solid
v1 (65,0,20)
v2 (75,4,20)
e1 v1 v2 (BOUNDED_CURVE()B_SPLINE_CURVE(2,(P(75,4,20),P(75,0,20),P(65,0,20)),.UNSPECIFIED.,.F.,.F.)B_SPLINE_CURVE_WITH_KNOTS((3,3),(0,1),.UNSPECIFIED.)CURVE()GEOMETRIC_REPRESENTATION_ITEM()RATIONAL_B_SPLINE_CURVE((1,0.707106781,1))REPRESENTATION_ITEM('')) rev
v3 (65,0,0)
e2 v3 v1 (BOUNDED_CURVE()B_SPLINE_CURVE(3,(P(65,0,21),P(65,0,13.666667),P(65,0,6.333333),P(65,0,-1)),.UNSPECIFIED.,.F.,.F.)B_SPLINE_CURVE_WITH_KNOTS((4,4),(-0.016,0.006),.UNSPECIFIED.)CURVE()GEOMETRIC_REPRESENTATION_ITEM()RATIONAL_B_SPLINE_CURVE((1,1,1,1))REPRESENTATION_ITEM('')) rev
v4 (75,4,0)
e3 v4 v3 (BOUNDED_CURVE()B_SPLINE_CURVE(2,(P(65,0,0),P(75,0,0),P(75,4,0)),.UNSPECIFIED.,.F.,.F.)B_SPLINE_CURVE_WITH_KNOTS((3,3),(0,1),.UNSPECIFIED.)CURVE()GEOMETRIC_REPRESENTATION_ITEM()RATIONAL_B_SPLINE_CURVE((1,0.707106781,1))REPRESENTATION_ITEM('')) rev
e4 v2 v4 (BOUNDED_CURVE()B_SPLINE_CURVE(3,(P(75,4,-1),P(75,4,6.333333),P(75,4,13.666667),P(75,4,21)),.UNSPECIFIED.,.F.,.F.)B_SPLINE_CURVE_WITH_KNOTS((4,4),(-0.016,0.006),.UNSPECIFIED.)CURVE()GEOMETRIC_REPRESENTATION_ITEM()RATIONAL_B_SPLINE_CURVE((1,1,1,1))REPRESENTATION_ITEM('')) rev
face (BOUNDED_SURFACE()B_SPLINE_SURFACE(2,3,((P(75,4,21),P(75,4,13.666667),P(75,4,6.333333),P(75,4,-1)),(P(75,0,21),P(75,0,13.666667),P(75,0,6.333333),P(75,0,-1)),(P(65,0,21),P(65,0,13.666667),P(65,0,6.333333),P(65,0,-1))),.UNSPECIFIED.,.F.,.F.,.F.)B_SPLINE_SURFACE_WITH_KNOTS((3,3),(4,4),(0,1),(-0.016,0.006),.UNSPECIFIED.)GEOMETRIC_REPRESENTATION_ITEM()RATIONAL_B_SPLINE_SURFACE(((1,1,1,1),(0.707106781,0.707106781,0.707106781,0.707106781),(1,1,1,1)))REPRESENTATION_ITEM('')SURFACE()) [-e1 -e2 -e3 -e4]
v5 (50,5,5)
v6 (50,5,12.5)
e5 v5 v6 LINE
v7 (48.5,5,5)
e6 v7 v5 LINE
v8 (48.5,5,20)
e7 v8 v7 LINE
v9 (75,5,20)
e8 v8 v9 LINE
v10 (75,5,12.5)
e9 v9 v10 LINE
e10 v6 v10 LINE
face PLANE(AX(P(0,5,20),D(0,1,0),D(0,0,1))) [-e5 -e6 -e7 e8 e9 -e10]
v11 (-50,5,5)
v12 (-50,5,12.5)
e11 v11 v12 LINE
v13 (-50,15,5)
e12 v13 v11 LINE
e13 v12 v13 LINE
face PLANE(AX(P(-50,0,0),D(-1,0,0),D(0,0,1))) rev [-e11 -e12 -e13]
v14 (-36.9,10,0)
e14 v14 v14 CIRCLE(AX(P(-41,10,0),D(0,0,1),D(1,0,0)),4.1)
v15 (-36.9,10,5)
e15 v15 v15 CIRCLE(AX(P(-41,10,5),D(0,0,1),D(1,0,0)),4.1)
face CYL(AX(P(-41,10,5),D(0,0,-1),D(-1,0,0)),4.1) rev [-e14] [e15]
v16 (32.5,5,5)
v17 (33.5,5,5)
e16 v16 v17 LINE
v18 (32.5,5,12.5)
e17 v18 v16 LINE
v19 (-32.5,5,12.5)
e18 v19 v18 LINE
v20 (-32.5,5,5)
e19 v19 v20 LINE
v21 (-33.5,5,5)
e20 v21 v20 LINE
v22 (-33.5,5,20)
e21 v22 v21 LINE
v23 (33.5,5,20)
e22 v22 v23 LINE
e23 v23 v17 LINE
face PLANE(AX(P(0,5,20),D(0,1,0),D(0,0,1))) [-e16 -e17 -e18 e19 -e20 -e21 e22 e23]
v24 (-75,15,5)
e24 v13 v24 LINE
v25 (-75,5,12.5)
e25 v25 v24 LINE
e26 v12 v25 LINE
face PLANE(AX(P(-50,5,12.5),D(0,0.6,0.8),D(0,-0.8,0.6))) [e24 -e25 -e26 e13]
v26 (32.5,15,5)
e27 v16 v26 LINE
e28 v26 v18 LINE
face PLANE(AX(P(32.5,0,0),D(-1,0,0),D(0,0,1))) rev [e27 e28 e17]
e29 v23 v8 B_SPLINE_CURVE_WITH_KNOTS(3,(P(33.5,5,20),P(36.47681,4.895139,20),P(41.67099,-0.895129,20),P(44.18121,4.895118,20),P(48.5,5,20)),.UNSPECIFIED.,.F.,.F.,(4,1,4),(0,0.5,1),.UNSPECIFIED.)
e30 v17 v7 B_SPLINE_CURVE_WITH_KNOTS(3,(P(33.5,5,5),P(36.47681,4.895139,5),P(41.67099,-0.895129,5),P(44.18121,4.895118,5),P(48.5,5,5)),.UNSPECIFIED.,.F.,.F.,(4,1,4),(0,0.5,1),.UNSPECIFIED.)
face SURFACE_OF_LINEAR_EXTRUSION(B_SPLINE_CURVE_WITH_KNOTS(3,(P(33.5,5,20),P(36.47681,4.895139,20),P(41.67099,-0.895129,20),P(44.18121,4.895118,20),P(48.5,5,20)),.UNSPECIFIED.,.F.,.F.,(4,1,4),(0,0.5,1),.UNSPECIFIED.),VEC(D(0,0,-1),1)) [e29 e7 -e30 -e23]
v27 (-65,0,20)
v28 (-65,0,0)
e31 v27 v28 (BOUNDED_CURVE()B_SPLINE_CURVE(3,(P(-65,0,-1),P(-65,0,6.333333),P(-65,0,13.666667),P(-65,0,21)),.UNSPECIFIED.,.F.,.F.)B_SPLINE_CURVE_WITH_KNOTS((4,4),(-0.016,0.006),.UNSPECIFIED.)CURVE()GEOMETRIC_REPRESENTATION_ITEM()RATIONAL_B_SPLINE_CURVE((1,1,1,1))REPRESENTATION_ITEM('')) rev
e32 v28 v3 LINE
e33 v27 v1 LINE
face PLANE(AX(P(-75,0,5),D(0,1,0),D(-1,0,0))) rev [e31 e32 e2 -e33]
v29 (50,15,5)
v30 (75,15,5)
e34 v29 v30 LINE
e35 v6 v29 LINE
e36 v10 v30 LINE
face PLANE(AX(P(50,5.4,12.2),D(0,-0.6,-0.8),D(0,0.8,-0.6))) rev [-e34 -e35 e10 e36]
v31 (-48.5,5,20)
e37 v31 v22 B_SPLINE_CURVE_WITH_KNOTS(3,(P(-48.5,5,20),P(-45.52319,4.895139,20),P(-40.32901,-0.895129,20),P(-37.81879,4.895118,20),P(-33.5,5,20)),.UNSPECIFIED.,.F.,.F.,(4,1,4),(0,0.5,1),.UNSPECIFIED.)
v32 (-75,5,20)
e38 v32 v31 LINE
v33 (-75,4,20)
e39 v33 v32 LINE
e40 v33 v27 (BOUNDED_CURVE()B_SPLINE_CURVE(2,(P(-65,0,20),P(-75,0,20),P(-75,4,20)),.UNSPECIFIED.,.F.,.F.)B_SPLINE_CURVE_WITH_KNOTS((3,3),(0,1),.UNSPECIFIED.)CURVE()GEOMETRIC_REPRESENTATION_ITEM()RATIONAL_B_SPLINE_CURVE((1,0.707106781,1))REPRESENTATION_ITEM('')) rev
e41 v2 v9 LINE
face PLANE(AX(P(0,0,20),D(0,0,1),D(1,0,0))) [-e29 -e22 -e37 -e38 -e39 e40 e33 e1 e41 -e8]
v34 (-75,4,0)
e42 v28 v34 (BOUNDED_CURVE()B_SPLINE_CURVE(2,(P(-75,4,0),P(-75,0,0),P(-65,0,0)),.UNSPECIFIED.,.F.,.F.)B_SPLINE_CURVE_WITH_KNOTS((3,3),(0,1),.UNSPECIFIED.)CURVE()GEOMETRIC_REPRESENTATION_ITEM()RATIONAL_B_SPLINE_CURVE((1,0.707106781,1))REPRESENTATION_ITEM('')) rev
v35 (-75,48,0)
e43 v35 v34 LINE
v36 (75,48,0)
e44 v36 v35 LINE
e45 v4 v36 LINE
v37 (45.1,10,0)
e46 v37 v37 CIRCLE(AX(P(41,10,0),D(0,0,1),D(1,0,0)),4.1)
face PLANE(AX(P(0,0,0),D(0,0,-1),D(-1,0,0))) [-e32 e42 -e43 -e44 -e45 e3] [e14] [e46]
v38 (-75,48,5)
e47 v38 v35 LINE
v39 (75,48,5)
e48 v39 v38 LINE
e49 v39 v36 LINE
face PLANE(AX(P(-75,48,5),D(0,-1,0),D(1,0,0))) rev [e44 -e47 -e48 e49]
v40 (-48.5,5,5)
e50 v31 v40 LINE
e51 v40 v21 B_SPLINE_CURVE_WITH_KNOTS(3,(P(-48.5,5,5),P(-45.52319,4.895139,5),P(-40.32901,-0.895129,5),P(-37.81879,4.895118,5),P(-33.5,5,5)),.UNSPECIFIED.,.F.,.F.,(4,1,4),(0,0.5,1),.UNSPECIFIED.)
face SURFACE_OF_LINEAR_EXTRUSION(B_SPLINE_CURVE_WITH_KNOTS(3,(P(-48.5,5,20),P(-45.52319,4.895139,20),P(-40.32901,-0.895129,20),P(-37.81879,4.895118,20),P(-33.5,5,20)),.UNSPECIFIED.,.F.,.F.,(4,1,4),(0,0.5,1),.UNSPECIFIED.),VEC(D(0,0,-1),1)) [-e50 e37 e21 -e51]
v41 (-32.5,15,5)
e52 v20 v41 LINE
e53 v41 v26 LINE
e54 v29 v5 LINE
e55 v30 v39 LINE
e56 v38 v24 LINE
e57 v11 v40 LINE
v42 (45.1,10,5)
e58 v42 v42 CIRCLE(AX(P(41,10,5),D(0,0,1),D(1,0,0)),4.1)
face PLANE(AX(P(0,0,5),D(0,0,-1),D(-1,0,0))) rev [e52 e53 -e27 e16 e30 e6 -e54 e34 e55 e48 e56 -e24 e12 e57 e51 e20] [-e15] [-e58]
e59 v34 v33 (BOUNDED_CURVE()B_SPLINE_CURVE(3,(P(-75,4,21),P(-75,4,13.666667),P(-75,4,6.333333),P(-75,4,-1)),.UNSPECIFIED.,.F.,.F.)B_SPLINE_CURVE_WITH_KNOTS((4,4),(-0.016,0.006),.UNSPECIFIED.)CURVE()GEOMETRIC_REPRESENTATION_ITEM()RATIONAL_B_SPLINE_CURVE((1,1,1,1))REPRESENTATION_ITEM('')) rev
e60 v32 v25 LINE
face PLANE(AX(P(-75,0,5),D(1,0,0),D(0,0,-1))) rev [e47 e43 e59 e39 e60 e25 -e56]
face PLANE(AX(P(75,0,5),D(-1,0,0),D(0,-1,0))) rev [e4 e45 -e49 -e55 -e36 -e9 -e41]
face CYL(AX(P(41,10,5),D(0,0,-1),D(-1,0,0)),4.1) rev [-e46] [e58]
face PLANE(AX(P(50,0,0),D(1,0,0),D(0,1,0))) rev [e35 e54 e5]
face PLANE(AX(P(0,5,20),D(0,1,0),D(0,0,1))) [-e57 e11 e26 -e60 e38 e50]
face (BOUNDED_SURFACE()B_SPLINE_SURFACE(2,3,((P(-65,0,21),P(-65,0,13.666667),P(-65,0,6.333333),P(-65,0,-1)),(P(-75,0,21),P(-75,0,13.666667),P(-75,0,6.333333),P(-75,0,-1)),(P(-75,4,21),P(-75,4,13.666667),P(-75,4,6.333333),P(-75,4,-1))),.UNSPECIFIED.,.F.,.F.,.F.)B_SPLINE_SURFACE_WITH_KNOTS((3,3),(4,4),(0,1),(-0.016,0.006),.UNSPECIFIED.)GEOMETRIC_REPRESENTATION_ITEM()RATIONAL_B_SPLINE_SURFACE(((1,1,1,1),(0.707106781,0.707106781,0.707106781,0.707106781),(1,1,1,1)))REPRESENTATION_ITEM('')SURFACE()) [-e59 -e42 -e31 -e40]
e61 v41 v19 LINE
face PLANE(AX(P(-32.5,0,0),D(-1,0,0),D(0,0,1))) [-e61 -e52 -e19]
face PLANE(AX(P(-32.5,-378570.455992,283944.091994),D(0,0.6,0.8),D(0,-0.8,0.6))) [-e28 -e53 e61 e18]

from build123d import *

# Parameters (mm, degrees)
SKETCH1_W           = 150
SKETCH1_H           = 48
SKETCH1_R           = 4.1
BOSS_EXTRUDE1_DEPTH = 5
BOSS_EXTRUDE2_DEPTH = 20
BOSS_EXTRUDE3_DEPTH = 25
BOSS_EXTRUDE4_START = -150
BOSS_EXTRUDE4_DEPTH = 25
BOSS_EXTRUDE5_START = -75
BOSS_EXTRUDE5_DEPTH = 32.5
FILLET5_SIZE        = 10
FILLET5_SIZE_2      = 4
FILLET6_SIZE        = 10
FILLET6_SIZE_2      = 4


with BuildPart() as part:
    # Sketch1 → Boss-Extrude1 (new body)
    with BuildSketch(Plane.XY):
        with Locations((0, 24)):
            Rectangle(SKETCH1_W, SKETCH1_H)
        with Locations((-41, 10)):
            Circle(SKETCH1_R, mode=Mode.SUBTRACT)
        with Locations((41, 10)):
            Circle(SKETCH1_R, mode=Mode.SUBTRACT)
    extrude(amount=BOSS_EXTRUDE1_DEPTH)

    # Sketch2 → Boss-Extrude2 (add)
    with BuildSketch(Plane.XY):
        with BuildLine():
            Line((-75, 5), (-75, 0))
            Line((-75, 0), (75, 0))
            Line((75, 0), (75, 5))
            Line((75, 5), (48.5, 5))
            add(Edge.make_bspline(
                [(33.5, 5), (36.476810307, 4.895138539), (41.670990079, -0.895128503), (44.181209535, 4.895118466), (48.5, 5)],
                knots=[0, 0, 0, 0, 0.5, 1, 1, 1, 1], degree=3))
            Line((33.5, 5), (-33.5, 5))
            add(Edge.make_bspline(
                [(-48.5, 5), (-45.523189693, 4.895138539), (-40.329009921, -0.895128503), (-37.818790465, 4.895118466), (-33.5, 5)],
                knots=[0, 0, 0, 0, 0.5, 1, 1, 1, 1], degree=3))
            Line((-48.5, 5), (-75, 5))
        make_face()
    extrude(amount=BOSS_EXTRUDE2_DEPTH)

    # Sketch4 → Boss-Extrude3 (add)
    with BuildSketch(Plane.ZY.offset(75)):
        Polygon((5, 5), (12.5, 5), (5, 15), align=None)
    extrude(amount=-BOSS_EXTRUDE3_DEPTH)

    # Sketch4<2> → Boss-Extrude4 (add)
    with BuildSketch(Plane.ZY.offset(75).offset(BOSS_EXTRUDE4_START)):
        Polygon((5, 5), (12.5, 5), (5, 15), align=None)
    extrude(amount=BOSS_EXTRUDE4_DEPTH)

    # Sketch4<3> → Boss-Extrude5 (add, symmetric)
    with BuildSketch(Plane.ZY.offset(75).offset(BOSS_EXTRUDE5_START)):
        Polygon((5, 5), (12.5, 5), (5, 15), align=None)
    extrude(amount=BOSS_EXTRUDE5_DEPTH, both=True)

    # Fillet5
    # an asymmetric fillet: 10, 4 mm, written as the material it takes off along each edge
    with BuildSketch(Plane(origin=(-75, 0, 45), x_dir=(1, 0, 0), z_dir=(0, 0, -1))) as fillet5_piece_1:
        with BuildLine():
            Bezier((FILLET5_SIZE, 0), (0, 0), (0, -FILLET5_SIZE_2), weights=[1, 0.707106781, 1])
            Line((0, -FILLET5_SIZE_2), (0, 0))
            Line((0, 0), (FILLET5_SIZE, 0))
        make_face()
    extrude(amount=70, mode=Mode.SUBTRACT)

    # Fillet6
    # an asymmetric fillet: 10, 4 mm, written as the material it takes off along each edge
    with BuildSketch(Plane(origin=(75, 0, -25), x_dir=(-1, 0, 0), z_dir=(0, 0, 1))) as fillet6_piece_1:
        with BuildLine():
            Bezier((FILLET6_SIZE, 0), (0, 0), (0, -FILLET6_SIZE_2), weights=[1, 0.707106781, 1])
            Line((0, -FILLET6_SIZE_2), (0, 0))
            Line((0, 0), (FILLET6_SIZE, 0))
        make_face()
    extrude(amount=70, mode=Mode.SUBTRACT)


solid = part.part
